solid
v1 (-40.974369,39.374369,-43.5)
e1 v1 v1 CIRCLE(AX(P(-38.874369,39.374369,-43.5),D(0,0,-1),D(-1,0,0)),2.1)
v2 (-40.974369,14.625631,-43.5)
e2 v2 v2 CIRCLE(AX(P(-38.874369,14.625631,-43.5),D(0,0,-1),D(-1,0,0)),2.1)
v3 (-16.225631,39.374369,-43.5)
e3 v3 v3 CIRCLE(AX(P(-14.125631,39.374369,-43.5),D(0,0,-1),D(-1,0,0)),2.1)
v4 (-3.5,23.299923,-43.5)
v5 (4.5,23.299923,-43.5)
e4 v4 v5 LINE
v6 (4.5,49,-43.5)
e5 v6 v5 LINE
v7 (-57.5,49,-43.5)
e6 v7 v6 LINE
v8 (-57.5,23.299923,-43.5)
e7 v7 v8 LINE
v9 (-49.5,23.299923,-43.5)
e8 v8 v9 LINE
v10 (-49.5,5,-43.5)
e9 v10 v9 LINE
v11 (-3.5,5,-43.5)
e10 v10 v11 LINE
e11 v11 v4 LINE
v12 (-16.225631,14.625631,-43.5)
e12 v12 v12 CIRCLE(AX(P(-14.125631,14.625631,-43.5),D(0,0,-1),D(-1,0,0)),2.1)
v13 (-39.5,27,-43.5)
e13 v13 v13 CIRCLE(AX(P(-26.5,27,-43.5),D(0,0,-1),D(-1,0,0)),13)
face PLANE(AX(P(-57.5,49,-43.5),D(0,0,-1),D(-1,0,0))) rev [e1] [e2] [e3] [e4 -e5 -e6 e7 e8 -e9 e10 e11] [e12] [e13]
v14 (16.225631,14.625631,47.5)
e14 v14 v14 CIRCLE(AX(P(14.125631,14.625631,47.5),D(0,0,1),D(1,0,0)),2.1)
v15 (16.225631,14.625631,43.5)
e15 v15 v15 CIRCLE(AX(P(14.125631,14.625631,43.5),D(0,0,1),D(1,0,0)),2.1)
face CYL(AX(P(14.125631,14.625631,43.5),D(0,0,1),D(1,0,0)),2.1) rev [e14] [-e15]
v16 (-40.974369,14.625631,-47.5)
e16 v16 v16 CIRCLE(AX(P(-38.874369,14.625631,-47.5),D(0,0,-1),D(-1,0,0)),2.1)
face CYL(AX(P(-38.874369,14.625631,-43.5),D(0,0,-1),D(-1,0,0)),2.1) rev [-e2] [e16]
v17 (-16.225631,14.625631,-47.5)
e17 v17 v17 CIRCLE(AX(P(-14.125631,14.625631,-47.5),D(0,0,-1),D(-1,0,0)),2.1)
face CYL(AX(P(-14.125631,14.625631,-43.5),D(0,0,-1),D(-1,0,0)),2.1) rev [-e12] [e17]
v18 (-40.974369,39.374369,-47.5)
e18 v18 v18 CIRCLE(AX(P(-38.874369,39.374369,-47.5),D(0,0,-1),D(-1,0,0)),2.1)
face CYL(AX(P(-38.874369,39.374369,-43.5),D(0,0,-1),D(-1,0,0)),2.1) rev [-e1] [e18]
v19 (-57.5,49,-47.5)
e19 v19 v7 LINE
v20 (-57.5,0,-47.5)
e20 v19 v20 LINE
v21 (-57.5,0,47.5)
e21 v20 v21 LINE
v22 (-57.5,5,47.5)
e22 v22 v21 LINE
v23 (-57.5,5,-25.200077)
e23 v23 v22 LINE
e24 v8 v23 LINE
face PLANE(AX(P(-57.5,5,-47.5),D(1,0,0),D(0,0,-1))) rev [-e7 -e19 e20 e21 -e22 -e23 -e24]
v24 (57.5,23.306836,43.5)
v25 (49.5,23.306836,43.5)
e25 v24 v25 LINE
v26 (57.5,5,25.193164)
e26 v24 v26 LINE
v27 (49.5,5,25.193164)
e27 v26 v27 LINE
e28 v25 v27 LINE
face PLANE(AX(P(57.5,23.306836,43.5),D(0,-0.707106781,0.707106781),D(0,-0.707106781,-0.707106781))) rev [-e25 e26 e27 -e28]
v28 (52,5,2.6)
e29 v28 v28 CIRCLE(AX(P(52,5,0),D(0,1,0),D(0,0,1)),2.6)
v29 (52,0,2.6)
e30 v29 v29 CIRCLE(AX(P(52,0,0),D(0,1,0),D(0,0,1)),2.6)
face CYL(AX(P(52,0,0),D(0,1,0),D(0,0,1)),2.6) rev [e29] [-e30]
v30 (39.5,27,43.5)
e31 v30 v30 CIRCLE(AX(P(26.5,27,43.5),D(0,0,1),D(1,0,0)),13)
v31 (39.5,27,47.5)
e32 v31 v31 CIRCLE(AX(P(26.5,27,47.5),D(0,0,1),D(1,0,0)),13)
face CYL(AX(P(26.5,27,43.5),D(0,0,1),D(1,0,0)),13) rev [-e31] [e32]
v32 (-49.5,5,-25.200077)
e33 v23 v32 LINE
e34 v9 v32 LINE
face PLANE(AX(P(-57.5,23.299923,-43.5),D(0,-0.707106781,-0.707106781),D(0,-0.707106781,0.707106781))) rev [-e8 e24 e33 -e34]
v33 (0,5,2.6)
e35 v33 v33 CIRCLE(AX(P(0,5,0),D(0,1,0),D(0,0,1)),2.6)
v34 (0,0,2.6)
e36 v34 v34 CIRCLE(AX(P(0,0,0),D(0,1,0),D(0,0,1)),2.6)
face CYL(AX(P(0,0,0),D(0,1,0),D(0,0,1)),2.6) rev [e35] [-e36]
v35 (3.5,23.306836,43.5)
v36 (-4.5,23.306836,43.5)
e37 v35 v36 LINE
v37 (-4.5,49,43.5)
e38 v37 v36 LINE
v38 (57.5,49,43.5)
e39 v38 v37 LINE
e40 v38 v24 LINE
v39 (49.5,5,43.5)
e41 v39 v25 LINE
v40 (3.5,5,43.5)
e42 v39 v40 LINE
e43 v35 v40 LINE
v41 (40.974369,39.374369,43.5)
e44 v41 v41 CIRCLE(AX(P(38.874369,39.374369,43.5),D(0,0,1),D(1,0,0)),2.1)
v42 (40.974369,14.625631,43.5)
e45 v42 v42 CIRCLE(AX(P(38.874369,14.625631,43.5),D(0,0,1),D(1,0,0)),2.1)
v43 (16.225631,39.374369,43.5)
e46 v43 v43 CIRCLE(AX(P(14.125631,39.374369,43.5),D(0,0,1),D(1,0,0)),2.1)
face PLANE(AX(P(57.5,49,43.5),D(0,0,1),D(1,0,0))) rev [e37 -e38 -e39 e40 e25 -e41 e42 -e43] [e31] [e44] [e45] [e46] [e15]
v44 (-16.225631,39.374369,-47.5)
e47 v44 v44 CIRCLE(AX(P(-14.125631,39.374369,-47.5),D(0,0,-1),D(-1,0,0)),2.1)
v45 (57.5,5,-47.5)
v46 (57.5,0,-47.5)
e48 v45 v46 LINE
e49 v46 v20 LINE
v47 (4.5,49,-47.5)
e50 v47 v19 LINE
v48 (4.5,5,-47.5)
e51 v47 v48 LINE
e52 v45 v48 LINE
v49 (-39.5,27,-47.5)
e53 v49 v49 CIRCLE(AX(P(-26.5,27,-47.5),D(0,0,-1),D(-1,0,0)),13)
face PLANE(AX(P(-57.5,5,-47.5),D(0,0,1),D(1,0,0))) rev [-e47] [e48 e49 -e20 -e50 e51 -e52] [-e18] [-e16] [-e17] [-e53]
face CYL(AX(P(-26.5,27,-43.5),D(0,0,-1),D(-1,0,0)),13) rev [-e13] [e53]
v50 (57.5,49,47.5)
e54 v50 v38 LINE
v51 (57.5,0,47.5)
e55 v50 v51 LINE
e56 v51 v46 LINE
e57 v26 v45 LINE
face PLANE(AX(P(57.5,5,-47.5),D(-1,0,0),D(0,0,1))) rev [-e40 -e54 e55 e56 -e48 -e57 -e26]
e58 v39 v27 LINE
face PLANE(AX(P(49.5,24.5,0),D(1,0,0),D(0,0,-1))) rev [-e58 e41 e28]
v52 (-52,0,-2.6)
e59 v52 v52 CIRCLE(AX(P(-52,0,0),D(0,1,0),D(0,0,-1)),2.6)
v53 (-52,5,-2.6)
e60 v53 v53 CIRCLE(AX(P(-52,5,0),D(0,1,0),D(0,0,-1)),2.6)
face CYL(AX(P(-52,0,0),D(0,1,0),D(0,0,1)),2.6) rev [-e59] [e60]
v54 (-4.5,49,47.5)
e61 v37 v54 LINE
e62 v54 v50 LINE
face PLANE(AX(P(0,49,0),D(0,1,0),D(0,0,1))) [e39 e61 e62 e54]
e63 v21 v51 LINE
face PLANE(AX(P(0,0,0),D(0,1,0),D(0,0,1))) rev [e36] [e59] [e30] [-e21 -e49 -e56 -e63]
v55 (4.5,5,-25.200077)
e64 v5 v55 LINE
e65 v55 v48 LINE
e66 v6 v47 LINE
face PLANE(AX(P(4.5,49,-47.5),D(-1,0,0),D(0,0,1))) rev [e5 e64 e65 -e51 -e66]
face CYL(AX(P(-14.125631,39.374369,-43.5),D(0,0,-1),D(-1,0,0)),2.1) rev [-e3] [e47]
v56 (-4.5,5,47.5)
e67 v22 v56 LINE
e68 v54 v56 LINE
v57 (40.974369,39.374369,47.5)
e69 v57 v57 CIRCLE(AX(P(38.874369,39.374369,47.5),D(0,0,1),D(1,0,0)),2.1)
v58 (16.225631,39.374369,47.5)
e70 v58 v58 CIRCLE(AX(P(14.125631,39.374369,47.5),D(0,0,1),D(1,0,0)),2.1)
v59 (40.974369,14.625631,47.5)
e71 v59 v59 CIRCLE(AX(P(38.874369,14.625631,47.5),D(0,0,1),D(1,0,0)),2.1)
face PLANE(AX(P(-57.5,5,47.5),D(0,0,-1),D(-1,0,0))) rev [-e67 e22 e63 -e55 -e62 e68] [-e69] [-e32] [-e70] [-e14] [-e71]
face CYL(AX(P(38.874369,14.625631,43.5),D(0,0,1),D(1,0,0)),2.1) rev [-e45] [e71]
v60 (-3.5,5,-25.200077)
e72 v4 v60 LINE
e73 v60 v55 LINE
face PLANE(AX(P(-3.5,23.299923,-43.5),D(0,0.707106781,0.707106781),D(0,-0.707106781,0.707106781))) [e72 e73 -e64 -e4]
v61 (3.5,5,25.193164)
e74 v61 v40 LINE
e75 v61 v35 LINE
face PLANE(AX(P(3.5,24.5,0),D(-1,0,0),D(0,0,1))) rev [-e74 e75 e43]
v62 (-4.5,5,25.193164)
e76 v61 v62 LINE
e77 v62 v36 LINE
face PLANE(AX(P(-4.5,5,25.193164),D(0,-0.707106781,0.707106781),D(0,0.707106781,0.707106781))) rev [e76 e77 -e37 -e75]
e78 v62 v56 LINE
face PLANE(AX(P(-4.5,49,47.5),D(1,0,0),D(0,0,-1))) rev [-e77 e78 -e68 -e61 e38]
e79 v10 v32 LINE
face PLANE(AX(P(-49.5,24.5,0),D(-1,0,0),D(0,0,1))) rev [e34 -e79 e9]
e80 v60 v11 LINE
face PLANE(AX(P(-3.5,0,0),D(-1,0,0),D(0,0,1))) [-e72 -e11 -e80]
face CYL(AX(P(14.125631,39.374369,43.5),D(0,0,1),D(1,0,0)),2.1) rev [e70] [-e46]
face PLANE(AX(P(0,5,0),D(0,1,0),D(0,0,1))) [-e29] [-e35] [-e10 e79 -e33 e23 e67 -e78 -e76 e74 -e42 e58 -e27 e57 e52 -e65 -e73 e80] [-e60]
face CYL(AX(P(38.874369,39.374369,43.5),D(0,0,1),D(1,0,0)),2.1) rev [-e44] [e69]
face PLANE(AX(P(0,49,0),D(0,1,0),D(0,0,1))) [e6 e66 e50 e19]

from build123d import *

# Parameters (mm, degrees)
SKETCH2_W           = 115
SKETCH2_H           = 95
BOSS_EXTRUDE1_DEPTH = 5
SKETCH3_W           = 62
SKETCH3_H           = 4
BOSS_EXTRUDE2_DEPTH = 44
RIB1_REACH          = 135.725
SKETCH5_WALL_W      = 295.338836254
SKETCH5_WALL_H      = 8
RIB2_REACH          = 94.202
SKETCH6_WALL_W      = 212.294222484
SKETCH6_WALL_H      = 8
RIB6_REACH          = 135.725
SKETCH7_WALL_W      = 295.32906057
SKETCH7_WALL_H      = 8
BOSS_EXTRUDE3_DEPTH = 8
SKETCH11_R          = 13
SKETCH11_R_2        = 2.1
CUT_EXTRUDE1_DEPTH  = 4
SKETCH12_R          = 13
SKETCH12_R_2        = 2.1
CUT_EXTRUDE2_DEPTH  = 4
SKETCH13_R          = 2.6
CUT_EXTRUDE3_DEPTH  = 5


with BuildPart() as part:
    # Sketch2 → Boss-Extrude1 (new body)
    with BuildSketch(Plane(origin=(0, 0, 0), x_dir=(1, 0, 0), z_dir=(0, 1, 0))):
        Rectangle(SKETCH2_W, SKETCH2_H)
    extrude(amount=BOSS_EXTRUDE1_DEPTH)

    # Sketch3 → Boss-Extrude2 (add)
    with BuildSketch(Plane(origin=(0, 5, 0), x_dir=(1, 0, 0), z_dir=(0, 1, 0))):
        with Locations((-26.5, 45.5)):
            Rectangle(SKETCH3_W, SKETCH3_H)
        with Locations((26.5, -45.5)):
            Rectangle(SKETCH3_W, SKETCH3_H)
    extrude(amount=BOSS_EXTRUDE2_DEPTH)

    # Sketch5 wall → Rib1 (add, up to next)
    with BuildSketch(Plane(origin=(57.5, 14.153417974, 34.346582025), x_dir=(0, -0.707106781187, -0.707106781187), z_dir=(0, 0.707106781187, -0.707106781187)), mode=Mode.PRIVATE) as rib1_sk1:
        with Locations((0, 4)):
            Rectangle(SKETCH5_WALL_W, SKETCH5_WALL_H)
    rib1_tool1 = extrude(rib1_sk1.sketch, amount=-RIB1_REACH, mode=Mode.PRIVATE) - part.part
    add(rib1_tool1.solids().sort_by_distance((57.5, 14.153417974, 34.346582025))[0])

    # Sketch6 wall → Rib2 (add, up to next)
    with BuildSketch(Plane(origin=(-4.5, 14.153417974, 34.346582025), x_dir=(0, 0.707106781187, 0.707106781187), z_dir=(0, 0.707106781187, -0.707106781187)), mode=Mode.PRIVATE) as rib2_sk1:
        with Locations((0, 4)):
            Rectangle(SKETCH6_WALL_W, SKETCH6_WALL_H)
    rib2_tool1 = extrude(rib2_sk1.sketch, amount=-RIB2_REACH, mode=Mode.PRIVATE) - part.part
    add(rib2_tool1.solids().sort_by_distance((-4.5, 14.153417974, 34.346582025))[0])

    # Sketch7 wall → Rib6 (add, up to next)
    with BuildSketch(Plane(origin=(-57.5, 14.149961749, -34.350038251), x_dir=(0, -0.707106781187, 0.707106781187), z_dir=(0, 0.707106781187, 0.707106781187)), mode=Mode.PRIVATE) as rib6_sk1:
        with Locations((0, 4)):
            Rectangle(SKETCH7_WALL_W, SKETCH7_WALL_H)
    rib6_tool1 = extrude(rib6_sk1.sketch, amount=-RIB6_REACH, mode=Mode.PRIVATE) - part.part
    add(rib6_tool1.solids().sort_by_distance((-57.5, 14.149961749, -34.350038251))[0])

    # Sketch9 → Boss-Extrude3 (add)
    with BuildSketch(Plane(origin=(4.5, 0, 0), x_dir=(0, 0, -1), z_dir=(1, 0, 0))):
        Polygon((43.5, 23.299923497), (25.200076503, 5), (43.5, 5), align=None)
    extrude(amount=-BOSS_EXTRUDE3_DEPTH)

    # Sketch11 → Cut-Extrude1 (cut)
    with BuildSketch(Plane(origin=(0, 0, -47.5), x_dir=(-1, 0, 0), z_dir=(0, 0, -1))):
        with Locations((26.5, 27)):
            Circle(SKETCH11_R)
        with Locations((38.874368671, 39.374368671)):
            Circle(SKETCH11_R_2)
        with Locations((38.874368671, 14.625631329)):
            Circle(SKETCH11_R_2)
        with Locations((14.125631329, 14.625631329)):
            Circle(SKETCH11_R_2)
        with Locations((14.125631329, 39.374368671)):
            Circle(SKETCH11_R_2)
    extrude(amount=-CUT_EXTRUDE1_DEPTH, mode=Mode.SUBTRACT)

    # Sketch12 → Cut-Extrude2 (cut)
    with BuildSketch(Plane.XY.offset(47.5)):
        with Locations((26.5, 27)):
            Circle(SKETCH12_R)
        with Locations((38.874368671, 39.374368671)):
            Circle(SKETCH12_R_2)
        with Locations((38.874368671, 14.625631329)):
            Circle(SKETCH12_R_2)
        with Locations((14.125631329, 14.625631329)):
            Circle(SKETCH12_R_2)
        with Locations((14.125631329, 39.374368671)):
            Circle(SKETCH12_R_2)
    extrude(amount=-CUT_EXTRUDE2_DEPTH, mode=Mode.SUBTRACT)

    # Sketch13 → Cut-Extrude3 (cut)
    with BuildSketch(Plane(origin=(0, 5, 0), x_dir=(1, 0, 0), z_dir=(0, 1, 0))):
        Circle(SKETCH13_R)
        with Locations((52, 0)):
            Circle(SKETCH13_R)
        with Locations((-52, 0)):
            Circle(SKETCH13_R)
    extrude(amount=-CUT_EXTRUDE3_DEPTH, mode=Mode.SUBTRACT)


solid = part.part
